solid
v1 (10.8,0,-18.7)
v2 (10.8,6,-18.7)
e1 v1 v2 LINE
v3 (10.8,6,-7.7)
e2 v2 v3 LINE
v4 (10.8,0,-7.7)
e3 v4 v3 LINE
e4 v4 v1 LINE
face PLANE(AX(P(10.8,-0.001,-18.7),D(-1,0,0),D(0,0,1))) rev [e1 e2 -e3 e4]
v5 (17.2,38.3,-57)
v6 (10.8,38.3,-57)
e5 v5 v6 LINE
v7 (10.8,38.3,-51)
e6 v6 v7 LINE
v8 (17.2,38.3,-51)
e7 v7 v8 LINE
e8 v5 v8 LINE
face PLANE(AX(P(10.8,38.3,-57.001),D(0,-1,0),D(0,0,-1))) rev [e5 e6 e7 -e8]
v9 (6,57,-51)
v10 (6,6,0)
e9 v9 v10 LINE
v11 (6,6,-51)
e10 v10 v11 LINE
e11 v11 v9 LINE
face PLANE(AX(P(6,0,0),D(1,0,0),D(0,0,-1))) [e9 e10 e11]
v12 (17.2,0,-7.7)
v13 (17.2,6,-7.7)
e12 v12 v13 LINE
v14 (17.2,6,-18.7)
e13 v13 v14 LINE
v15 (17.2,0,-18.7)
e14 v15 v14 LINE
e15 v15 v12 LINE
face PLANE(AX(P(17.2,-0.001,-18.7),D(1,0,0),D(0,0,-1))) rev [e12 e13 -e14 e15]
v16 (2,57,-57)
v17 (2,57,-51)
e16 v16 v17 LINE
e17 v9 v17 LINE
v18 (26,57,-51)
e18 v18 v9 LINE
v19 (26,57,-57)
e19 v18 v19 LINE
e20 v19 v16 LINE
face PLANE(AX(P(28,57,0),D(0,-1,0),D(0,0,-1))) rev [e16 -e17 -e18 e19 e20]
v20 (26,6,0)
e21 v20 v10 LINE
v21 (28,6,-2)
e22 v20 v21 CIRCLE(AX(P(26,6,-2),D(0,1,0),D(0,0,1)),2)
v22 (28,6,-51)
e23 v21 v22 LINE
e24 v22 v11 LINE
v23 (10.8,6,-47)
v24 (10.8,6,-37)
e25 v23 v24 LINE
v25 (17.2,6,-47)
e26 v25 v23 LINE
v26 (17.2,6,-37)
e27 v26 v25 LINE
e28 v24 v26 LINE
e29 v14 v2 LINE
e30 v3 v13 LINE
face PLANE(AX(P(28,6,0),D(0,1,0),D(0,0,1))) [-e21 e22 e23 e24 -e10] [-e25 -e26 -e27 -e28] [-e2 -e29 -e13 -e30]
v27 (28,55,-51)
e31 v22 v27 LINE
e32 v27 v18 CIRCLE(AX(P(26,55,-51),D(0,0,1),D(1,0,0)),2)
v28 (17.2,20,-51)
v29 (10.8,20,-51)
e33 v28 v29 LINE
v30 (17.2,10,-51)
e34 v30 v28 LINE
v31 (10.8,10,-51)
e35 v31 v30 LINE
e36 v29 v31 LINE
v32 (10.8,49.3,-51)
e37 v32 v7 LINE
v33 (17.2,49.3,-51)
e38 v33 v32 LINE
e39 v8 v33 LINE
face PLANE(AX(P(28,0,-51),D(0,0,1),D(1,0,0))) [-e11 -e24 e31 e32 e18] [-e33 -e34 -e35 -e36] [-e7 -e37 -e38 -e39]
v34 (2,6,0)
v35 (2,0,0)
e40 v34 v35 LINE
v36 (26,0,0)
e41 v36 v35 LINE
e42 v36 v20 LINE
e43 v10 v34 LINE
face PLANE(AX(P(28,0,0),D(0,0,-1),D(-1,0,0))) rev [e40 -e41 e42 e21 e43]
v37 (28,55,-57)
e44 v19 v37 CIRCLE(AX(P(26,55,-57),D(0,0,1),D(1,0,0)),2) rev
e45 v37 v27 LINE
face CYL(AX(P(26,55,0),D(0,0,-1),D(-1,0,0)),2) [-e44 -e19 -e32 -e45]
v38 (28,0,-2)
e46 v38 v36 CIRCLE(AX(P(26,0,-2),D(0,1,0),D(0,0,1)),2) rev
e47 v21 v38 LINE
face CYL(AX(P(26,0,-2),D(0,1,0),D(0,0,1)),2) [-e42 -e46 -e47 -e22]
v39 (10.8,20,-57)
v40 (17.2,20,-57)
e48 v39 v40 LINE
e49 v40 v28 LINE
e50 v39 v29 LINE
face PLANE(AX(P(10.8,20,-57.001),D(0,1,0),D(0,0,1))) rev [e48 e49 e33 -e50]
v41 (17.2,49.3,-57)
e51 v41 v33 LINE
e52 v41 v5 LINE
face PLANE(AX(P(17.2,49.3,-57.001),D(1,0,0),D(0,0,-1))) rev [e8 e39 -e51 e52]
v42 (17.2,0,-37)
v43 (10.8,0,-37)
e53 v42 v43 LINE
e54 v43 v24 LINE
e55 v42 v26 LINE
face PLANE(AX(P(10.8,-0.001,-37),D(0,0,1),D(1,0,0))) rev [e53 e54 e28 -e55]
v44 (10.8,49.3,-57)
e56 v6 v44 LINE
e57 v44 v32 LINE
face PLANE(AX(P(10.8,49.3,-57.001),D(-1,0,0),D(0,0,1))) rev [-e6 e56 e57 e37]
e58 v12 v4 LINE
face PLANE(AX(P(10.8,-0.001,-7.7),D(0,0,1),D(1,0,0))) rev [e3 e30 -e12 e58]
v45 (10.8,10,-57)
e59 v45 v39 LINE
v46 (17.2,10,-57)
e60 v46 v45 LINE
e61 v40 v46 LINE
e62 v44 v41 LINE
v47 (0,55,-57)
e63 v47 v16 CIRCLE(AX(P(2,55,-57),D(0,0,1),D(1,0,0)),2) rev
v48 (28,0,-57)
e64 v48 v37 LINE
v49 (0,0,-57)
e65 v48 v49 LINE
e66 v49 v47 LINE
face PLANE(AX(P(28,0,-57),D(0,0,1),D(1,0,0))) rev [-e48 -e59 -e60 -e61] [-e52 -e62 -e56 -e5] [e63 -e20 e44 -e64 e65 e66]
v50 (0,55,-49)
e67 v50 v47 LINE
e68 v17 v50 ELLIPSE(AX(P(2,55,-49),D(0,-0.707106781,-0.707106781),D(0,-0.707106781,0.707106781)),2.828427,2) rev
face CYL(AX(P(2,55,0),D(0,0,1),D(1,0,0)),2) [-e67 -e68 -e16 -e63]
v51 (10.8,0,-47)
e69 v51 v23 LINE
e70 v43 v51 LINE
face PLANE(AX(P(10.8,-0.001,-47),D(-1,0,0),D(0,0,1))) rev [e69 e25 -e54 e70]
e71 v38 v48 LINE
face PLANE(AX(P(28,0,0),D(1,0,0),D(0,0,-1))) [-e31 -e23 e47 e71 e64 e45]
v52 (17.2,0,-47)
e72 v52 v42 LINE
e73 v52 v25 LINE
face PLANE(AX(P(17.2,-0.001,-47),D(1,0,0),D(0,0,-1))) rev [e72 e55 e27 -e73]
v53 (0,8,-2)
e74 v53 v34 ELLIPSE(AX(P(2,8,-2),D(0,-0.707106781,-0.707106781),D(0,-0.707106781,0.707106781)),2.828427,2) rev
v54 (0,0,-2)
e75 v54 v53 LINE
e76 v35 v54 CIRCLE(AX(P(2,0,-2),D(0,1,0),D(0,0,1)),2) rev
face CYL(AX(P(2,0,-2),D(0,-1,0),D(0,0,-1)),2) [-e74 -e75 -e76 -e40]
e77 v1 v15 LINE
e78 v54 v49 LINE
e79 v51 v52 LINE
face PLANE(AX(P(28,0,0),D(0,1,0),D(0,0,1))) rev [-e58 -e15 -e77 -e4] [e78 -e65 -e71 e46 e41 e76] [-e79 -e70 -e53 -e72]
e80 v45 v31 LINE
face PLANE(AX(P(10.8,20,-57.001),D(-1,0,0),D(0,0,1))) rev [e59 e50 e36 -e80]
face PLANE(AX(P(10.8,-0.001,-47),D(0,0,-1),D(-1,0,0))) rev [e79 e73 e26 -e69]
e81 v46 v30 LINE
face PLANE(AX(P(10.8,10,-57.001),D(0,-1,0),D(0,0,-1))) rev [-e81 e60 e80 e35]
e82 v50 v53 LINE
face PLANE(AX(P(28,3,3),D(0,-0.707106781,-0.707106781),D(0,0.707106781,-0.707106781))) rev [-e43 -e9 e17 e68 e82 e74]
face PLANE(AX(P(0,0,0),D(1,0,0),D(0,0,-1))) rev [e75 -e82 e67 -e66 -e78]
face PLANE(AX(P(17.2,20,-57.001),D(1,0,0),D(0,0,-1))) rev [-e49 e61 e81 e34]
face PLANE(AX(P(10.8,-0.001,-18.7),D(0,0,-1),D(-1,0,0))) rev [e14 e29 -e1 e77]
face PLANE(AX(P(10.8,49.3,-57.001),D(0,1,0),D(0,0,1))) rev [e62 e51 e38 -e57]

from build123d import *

# Parameters (mm, degrees)
SALIENTE_EXTRUIR1_DEPTH = 28
VACIADO2_START          = 6
VACIADO2_OUTLINE_W      = 22
VACIADO2_OUTLINE_H      = 53
VACIADO2_DEPTH          = 51
CORTAR_EXTRUIR1_REACH   = 83.449
CROQUIS2_W              = 6.4
CROQUIS2_H              = 11
CROQUIS2_H_2            = 10
CORTAR_EXTRUIR2_REACH   = 83.449
CROQUIS5_W              = 6.4
CROQUIS5_H              = 10
CROQUIS5_H_2            = 11
REDONDEO2_R             = 2


# Read off the part's stored shape, not the designer's step: Vaciado2
with BuildPart() as part:
    # Croquis1 → Saliente-Extruir1 (new body)
    with BuildSketch(Plane(origin=(0, 0, 0), x_dir=(0, 0, -1), z_dir=(1, 0, 0))):
        Polygon((0, 0), (57, 0), (57, 57), (51, 57), (0, 6), align=None)
    extrude(amount=SALIENTE_EXTRUIR1_DEPTH)

    # Vaciado2 outline → Vaciado2 (cut)
    with BuildSketch(Plane(origin=(0, 0, 0), x_dir=(1, 0, 0), z_dir=(0, 1, 0)).offset(VACIADO2_START)):
        with Locations((17, 24.5)):
            Rectangle(VACIADO2_OUTLINE_W, VACIADO2_OUTLINE_H)
    extrude(amount=VACIADO2_DEPTH, mode=Mode.SUBTRACT)

    # Croquis2 → Cortar-Extruir1 (cut, up to next)
    with BuildSketch(Plane.XY.offset(-51), mode=Mode.PRIVATE) as cortar_extruir1_sk1:
        with Locations((14, 43.8)):
            Rectangle(CROQUIS2_W, CROQUIS2_H)
    cortar_extruir1_tool1 = extrude(cortar_extruir1_sk1.sketch, amount=-CORTAR_EXTRUIR1_REACH, mode=Mode.PRIVATE) & part.part
    # Croquis2 → Cortar-Extruir1 (cut, up to next)
    with BuildSketch(Plane.XY.offset(-51), mode=Mode.PRIVATE) as cortar_extruir1_sk2:
        with Locations((14, 15)):
            Rectangle(CROQUIS2_W, CROQUIS2_H_2)
    cortar_extruir1_tool2 = extrude(cortar_extruir1_sk2.sketch, amount=-CORTAR_EXTRUIR1_REACH, mode=Mode.PRIVATE) & part.part
    add(cortar_extruir1_tool1.solids().sort_by_distance((14, 43.8, -51))[0], mode=Mode.SUBTRACT)
    add(cortar_extruir1_tool2.solids().sort_by_distance((14, 15, -51))[0], mode=Mode.SUBTRACT)

    # Croquis5 → Cortar-Extruir2 (cut, up to next)
    with BuildSketch(Plane(origin=(0, 6, 0), x_dir=(1, 0, 0), z_dir=(0, 1, 0)), mode=Mode.PRIVATE) as cortar_extruir2_sk1:
        with Locations((14, 42)):
            Rectangle(CROQUIS5_W, CROQUIS5_H)
    cortar_extruir2_tool1 = extrude(cortar_extruir2_sk1.sketch, amount=-CORTAR_EXTRUIR2_REACH, mode=Mode.PRIVATE) & part.part
    # Croquis5 → Cortar-Extruir2 (cut, up to next)
    with BuildSketch(Plane(origin=(0, 6, 0), x_dir=(1, 0, 0), z_dir=(0, 1, 0)), mode=Mode.PRIVATE) as cortar_extruir2_sk2:
        with Locations((14, 13.2)):
            Rectangle(CROQUIS5_W, CROQUIS5_H_2)
    cortar_extruir2_tool2 = extrude(cortar_extruir2_sk2.sketch, amount=-CORTAR_EXTRUIR2_REACH, mode=Mode.PRIVATE) & part.part
    add(cortar_extruir2_tool1.solids().sort_by_distance((14, 6, -42))[0], mode=Mode.SUBTRACT)
    add(cortar_extruir2_tool2.solids().sort_by_distance((14, 6, -13.2))[0], mode=Mode.SUBTRACT)

    # Redondeo2
    redondeo2_edges = [part.edges().sort_by_distance(p)[0] for p in [
        (28, 3, 0),
        (28, 57, -54),
        (0, 3, 0),
        (0, 57, -54),
    ]]
    fillet(redondeo2_edges, radius=REDONDEO2_R)


solid = part.part
